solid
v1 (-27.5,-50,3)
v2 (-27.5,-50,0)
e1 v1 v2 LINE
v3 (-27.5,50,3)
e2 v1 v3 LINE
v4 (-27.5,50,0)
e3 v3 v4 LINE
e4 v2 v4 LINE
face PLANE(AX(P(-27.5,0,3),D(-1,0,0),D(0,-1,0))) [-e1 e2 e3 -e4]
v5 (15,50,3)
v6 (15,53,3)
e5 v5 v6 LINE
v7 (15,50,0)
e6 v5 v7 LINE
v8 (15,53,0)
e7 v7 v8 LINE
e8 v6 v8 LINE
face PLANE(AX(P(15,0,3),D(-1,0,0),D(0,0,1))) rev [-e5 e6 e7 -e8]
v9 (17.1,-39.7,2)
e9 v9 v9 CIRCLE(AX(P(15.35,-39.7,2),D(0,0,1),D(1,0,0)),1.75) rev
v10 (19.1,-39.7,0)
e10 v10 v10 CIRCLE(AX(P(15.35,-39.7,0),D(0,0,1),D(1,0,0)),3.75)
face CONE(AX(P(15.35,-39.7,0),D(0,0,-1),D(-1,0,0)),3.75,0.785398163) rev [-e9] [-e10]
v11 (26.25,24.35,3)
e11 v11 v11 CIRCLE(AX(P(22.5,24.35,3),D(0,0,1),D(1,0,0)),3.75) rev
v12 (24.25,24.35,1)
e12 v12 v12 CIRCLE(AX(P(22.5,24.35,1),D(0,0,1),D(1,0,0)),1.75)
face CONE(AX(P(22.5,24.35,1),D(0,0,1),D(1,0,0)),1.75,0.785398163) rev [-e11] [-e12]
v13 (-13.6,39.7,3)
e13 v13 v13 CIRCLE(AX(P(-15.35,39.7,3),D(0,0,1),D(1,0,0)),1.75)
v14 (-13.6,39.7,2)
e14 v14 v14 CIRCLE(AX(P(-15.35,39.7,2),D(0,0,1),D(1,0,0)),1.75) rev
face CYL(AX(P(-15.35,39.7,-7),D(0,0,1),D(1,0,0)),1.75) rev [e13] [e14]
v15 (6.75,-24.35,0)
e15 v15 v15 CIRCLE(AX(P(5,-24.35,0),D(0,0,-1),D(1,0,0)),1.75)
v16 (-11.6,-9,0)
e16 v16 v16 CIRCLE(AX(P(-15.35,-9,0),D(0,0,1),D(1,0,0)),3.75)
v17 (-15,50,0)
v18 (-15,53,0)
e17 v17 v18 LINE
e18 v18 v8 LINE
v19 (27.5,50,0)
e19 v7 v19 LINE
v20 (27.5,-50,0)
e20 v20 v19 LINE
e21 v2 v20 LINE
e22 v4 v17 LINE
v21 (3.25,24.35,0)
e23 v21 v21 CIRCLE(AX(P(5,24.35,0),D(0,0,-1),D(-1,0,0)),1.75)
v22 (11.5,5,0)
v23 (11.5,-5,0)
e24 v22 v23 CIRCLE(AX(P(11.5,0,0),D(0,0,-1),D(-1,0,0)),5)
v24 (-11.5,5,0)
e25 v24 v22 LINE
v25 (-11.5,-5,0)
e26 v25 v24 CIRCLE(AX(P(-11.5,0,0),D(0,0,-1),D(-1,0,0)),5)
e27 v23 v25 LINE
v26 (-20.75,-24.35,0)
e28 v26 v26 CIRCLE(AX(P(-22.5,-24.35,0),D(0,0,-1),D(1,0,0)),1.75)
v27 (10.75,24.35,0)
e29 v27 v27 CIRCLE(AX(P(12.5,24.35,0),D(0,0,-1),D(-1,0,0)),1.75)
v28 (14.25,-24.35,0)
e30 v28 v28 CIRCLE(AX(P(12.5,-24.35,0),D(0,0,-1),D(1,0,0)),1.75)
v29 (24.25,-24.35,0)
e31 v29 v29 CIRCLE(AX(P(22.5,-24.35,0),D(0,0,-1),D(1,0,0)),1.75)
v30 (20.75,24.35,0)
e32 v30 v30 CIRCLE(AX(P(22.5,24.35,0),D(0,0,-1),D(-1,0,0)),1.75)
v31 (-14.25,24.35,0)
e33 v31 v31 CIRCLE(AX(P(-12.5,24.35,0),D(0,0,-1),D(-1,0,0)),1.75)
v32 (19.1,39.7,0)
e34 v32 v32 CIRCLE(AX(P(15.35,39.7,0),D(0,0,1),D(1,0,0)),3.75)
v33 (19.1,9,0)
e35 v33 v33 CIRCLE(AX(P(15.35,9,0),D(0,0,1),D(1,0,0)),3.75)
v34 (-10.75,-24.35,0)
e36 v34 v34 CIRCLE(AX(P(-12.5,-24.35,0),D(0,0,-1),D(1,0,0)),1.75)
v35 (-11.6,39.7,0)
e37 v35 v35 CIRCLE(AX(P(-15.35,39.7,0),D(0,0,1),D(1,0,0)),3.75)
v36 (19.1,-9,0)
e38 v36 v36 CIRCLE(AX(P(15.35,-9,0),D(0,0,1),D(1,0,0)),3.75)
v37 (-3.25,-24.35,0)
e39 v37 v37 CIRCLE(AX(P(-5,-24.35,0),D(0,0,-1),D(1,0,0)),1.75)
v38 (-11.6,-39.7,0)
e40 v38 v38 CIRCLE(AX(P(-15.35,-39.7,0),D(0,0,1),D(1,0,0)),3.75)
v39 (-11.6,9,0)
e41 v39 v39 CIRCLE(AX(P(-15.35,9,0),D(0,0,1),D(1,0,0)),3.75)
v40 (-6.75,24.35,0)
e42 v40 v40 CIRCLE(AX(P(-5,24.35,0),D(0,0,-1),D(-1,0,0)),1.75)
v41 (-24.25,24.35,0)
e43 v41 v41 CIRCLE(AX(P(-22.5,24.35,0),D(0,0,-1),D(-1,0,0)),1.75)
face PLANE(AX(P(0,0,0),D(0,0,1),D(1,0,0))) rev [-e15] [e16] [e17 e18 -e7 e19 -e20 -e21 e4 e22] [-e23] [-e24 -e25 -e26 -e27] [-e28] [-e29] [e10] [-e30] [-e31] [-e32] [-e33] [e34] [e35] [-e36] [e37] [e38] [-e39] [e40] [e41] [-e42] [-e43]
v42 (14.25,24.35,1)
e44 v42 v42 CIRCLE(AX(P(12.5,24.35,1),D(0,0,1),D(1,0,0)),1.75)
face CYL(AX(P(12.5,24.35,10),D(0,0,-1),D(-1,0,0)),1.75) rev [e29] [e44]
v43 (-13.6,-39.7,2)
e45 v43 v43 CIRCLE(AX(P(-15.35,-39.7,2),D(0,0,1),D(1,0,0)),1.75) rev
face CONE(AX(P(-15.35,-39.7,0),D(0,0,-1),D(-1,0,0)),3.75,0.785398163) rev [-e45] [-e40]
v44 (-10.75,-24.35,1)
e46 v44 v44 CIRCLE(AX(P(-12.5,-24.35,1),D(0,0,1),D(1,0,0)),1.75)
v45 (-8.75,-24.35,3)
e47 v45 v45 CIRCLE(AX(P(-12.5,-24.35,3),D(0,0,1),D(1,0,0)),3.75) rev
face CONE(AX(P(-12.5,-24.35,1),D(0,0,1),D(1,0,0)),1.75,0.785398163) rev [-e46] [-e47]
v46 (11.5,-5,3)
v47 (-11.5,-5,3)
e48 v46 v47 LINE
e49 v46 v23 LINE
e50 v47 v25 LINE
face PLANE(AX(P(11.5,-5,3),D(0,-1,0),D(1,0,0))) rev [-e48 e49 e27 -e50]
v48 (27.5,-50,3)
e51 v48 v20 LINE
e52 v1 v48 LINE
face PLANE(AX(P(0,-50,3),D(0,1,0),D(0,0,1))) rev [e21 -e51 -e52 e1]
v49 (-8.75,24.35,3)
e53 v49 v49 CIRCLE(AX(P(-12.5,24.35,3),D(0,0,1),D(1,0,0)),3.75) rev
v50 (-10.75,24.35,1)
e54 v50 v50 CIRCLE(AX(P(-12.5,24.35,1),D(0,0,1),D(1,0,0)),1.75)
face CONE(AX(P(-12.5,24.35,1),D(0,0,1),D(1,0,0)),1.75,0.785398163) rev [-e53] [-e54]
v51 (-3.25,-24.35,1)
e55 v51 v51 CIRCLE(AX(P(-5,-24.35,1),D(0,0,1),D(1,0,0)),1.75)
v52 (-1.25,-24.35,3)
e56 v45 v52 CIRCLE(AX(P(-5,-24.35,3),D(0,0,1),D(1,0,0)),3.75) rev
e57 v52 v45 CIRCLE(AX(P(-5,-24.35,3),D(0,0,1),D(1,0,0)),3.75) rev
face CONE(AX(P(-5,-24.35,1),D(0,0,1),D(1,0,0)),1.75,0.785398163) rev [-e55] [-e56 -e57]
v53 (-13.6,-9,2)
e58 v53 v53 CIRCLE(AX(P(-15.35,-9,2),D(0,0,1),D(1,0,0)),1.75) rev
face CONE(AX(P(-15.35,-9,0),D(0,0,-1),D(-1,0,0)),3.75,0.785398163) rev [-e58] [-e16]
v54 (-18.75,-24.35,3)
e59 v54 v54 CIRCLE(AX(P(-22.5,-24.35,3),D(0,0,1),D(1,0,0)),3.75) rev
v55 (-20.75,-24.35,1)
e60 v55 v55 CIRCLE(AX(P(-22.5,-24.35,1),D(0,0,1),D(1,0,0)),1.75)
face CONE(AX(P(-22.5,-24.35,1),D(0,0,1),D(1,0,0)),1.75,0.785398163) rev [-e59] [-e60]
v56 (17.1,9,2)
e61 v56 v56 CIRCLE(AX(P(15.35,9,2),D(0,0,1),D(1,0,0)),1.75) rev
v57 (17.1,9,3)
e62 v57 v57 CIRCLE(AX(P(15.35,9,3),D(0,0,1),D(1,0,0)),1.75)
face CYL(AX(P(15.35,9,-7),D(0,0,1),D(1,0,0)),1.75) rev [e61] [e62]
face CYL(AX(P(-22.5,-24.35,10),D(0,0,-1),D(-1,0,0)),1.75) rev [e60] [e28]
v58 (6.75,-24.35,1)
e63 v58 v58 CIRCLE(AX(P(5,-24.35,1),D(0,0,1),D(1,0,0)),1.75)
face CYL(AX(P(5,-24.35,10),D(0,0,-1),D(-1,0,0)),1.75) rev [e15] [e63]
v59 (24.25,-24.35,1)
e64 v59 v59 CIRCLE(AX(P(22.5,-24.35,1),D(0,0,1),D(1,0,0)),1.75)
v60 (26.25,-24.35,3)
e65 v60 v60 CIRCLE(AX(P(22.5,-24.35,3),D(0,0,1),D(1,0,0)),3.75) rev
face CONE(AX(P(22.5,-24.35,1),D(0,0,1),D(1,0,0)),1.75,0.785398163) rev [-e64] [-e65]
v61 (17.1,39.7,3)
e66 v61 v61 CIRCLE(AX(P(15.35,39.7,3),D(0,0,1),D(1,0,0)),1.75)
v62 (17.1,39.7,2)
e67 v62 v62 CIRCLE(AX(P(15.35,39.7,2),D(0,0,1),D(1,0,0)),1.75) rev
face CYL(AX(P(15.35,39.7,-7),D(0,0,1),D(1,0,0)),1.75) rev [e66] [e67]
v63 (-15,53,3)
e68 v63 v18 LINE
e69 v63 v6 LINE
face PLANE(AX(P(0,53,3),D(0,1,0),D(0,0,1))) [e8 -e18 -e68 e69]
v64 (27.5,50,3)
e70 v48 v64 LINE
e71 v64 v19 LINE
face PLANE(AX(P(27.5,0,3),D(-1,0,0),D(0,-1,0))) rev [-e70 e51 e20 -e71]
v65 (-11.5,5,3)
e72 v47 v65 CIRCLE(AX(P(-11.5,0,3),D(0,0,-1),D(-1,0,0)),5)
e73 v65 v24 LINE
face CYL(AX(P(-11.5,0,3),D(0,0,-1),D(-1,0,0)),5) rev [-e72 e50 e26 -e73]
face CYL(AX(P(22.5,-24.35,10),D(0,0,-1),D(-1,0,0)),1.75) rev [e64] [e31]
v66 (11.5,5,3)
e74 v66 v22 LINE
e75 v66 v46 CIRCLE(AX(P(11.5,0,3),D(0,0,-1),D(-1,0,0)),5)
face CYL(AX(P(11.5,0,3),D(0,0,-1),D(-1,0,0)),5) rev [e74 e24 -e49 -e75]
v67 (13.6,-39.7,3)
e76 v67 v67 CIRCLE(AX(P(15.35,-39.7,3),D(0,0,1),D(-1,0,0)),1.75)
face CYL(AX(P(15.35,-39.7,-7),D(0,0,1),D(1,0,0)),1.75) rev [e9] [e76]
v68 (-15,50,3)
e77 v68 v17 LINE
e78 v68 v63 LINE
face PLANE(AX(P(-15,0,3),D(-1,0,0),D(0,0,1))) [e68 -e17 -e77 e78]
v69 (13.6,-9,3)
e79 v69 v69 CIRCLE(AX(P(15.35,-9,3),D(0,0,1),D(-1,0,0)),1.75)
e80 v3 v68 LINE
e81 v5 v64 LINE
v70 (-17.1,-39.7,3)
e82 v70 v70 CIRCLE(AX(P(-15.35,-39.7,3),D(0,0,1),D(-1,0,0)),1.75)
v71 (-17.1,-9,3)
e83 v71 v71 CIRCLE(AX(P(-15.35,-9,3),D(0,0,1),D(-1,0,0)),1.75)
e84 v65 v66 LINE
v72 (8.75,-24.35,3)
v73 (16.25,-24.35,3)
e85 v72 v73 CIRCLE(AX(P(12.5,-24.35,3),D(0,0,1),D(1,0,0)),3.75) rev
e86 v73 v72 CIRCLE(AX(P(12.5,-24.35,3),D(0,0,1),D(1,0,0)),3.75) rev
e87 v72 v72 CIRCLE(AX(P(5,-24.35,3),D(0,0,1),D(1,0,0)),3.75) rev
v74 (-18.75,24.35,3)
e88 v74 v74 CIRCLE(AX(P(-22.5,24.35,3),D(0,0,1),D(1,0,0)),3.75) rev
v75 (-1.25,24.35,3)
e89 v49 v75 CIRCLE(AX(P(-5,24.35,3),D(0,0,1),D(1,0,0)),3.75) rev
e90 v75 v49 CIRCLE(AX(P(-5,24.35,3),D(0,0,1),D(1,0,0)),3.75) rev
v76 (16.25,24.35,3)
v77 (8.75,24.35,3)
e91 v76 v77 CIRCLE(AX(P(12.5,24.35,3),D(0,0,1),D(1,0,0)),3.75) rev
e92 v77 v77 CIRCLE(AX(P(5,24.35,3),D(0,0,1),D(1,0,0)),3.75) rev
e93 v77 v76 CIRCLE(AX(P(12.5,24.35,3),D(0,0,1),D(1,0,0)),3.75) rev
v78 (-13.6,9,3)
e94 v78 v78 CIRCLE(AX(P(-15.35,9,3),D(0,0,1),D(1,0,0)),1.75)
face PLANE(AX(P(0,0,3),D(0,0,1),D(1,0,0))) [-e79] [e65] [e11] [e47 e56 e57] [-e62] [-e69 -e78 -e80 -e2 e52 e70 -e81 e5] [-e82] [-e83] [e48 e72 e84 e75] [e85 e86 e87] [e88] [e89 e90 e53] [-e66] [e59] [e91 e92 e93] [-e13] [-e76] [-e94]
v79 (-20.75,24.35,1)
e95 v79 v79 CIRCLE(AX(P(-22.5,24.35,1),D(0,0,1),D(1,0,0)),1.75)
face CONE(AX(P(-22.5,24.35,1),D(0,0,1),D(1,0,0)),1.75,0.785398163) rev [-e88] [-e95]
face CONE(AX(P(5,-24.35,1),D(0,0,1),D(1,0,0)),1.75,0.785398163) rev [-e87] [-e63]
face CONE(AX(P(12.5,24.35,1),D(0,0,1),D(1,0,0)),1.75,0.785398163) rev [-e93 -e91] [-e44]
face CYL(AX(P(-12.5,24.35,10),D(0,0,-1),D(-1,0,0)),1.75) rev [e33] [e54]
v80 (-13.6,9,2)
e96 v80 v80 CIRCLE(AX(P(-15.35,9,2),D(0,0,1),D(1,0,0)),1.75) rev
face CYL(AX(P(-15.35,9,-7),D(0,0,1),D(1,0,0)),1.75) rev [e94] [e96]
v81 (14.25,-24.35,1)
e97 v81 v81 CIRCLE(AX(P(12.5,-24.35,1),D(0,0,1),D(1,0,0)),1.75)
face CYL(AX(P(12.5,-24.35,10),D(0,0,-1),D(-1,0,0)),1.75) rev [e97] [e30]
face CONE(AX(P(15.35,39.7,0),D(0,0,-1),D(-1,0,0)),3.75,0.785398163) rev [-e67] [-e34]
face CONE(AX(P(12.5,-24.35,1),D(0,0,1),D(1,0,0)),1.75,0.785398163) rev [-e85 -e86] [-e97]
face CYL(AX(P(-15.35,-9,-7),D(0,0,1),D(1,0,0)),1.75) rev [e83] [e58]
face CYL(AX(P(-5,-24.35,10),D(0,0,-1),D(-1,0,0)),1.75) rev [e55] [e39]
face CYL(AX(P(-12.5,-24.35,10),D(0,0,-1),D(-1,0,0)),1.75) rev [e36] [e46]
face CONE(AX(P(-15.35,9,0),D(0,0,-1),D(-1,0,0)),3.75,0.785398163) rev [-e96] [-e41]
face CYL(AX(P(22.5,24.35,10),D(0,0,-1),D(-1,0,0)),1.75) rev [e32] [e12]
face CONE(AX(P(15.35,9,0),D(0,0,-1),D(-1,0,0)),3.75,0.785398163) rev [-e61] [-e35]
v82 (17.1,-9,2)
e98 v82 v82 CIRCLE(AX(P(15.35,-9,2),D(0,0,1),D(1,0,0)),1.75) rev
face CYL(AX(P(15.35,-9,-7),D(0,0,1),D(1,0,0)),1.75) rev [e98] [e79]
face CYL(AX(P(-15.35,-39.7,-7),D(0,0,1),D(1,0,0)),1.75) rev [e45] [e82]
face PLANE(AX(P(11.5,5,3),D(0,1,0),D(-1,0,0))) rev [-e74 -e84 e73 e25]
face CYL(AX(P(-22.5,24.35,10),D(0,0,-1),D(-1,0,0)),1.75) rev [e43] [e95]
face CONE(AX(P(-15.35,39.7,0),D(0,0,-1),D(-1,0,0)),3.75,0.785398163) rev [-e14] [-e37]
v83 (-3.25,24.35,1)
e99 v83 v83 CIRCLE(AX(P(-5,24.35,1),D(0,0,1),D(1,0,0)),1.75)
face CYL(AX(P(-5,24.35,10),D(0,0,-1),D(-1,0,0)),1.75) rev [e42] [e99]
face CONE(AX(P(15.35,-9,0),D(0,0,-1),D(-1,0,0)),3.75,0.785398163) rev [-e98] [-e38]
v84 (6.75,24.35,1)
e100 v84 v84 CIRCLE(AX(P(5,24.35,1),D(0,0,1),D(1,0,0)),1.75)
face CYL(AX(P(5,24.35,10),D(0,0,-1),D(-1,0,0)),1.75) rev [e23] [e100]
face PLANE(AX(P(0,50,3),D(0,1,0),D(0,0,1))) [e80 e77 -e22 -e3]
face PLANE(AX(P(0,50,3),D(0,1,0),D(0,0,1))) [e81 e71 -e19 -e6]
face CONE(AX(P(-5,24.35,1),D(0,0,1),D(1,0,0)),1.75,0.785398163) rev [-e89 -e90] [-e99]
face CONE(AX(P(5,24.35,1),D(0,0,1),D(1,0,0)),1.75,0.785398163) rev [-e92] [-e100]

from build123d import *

# Parameters (mm, degrees)
SKETCH_1_W          = 30
SKETCH_1_H          = 3
EXTRUDE_1_DEPTH     = 3
SKETCH_2_R          = 1.75
CUT_EXTRUDE_1_DEPTH = 10
SKETCH_3_R          = 1.75
CUT_EXTRUDE_2_DEPTH = 10
CHAMFER_1_SIZE      = 2
CHAMFER_2_SIZE      = 2
CUT_EXTRUDE_3_DEPTH = 3


with BuildPart() as part:
    # Эскиз1 → Бобышка-Вытянуть1 (new body)
    with BuildSketch(Plane.XY):
        Polygon((-27.5, 50), (-27.5, -50), (27.5, -50), (27.5, 50), (15, 50), (15, 47), (-15, 47), (-15, 50), align=None)
        with Locations((0, 48.5)):
            Rectangle(SKETCH_1_W, SKETCH_1_H)
        with Locations((0, 51.5)):
            Rectangle(SKETCH_1_W, SKETCH_1_H)
    extrude(amount=EXTRUDE_1_DEPTH)

    # Эскиз2 → Вырез-Вытянуть1 (cut)
    with BuildSketch(Plane.XY.offset(3)):
        with Locations((-15.35, 39.7)):
            Circle(SKETCH_2_R)
        with Locations((15.35, 39.7)):
            Circle(SKETCH_2_R)
        with Locations((15.35, 9)):
            Circle(SKETCH_2_R)
        with Locations((-15.35, 9)):
            Circle(SKETCH_2_R)
        with Locations((-15.35, -9)):
            Circle(SKETCH_2_R)
        with Locations((15.35, -9)):
            Circle(SKETCH_2_R)
        with Locations((15.35, -39.7)):
            Circle(SKETCH_2_R)
        with Locations((-15.35, -39.7)):
            Circle(SKETCH_2_R)
    extrude(amount=-CUT_EXTRUDE_1_DEPTH, mode=Mode.SUBTRACT)

    # Эскиз3 → Вырез-Вытянуть2 (cut)
    with BuildSketch(Plane(origin=(0, 0, 0), x_dir=(-1, 0, 0), z_dir=(0, 0, -1))):
        with Locations((-22.5, 24.35)):
            Circle(SKETCH_3_R)
        with Locations((-12.5, 24.35)):
            Circle(SKETCH_3_R)
        with Locations((-5, 24.35)):
            Circle(SKETCH_3_R)
        with Locations((5, 24.35)):
            Circle(SKETCH_3_R)
        with Locations((12.5, 24.35)):
            Circle(SKETCH_3_R)
        with Locations((22.5, 24.35)):
            Circle(SKETCH_3_R)
        with Locations(Location((22.5, -24.35, 0), (0, 0, 180))):
            Circle(SKETCH_3_R)
        with Locations(Location((12.5, -24.35, 0), (0, 0, 180))):
            Circle(SKETCH_3_R)
        with Locations(Location((5, -24.35, 0), (0, 0, 180))):
            Circle(SKETCH_3_R)
        with Locations(Location((-5, -24.35, 0), (0, 0, 180))):
            Circle(SKETCH_3_R)
        with Locations(Location((-12.5, -24.35, 0), (0, 0, 180))):
            Circle(SKETCH_3_R)
        with Locations(Location((-22.5, -24.35, 0), (0, 0, 180))):
            Circle(SKETCH_3_R)
    extrude(amount=-CUT_EXTRUDE_2_DEPTH, mode=Mode.SUBTRACT)

    # Фаска1
    chamfer_1_edges = [part.edges().sort_by_distance(p)[0] for p in [
        (-17.1, -9, 0),
        (-17.1, 9, 0),
        (13.6, 9, 0),
        (-17.1, 39.7, 0),
        (13.6, -9, 0),
        (13.6, -39.7, 0),
        (-17.1, -39.7, 0),
        (13.6, 39.7, 0),
    ]]
    chamfer(chamfer_1_edges, length=CHAMFER_1_SIZE)

    # Фаска2
    chamfer_2_edges = [part.edges().sort_by_distance(p)[0] for p in [
        (14.25, 24.35, 3),
        (3.25, -24.35, 3),
        (10.75, -24.35, 3),
        (20.75, -24.35, 3),
        (24.25, 24.35, 3),
        (-6.75, -24.35, 3),
        (-14.25, -24.35, 3),
        (-24.25, -24.35, 3),
        (-20.75, 24.35, 3),
        (-10.75, 24.35, 3),
        (-3.25, 24.35, 3),
        (6.75, 24.35, 3),
    ]]
    chamfer(chamfer_2_edges, length=CHAMFER_2_SIZE - 0.0001)  # a hair under: the kernel refuses the full size

    # Эскиз4 → Вырез-Вытянуть3 (cut)
    with BuildSketch(Plane(origin=(0, 0, 0), x_dir=(-1, 0, 0), z_dir=(0, 0, -1))):
        with BuildLine():
            Line((-11.5, 5), (11.5, 5))
            ThreePointArc((11.5, 5), (16.5, 0), (11.5, -5))
            Line((11.5, -5), (-11.5, -5))
            ThreePointArc((-11.5, -5), (-16.5, 0), (-11.5, 5))
        make_face()
    extrude(amount=-CUT_EXTRUDE_3_DEPTH, mode=Mode.SUBTRACT)


solid = part.part
